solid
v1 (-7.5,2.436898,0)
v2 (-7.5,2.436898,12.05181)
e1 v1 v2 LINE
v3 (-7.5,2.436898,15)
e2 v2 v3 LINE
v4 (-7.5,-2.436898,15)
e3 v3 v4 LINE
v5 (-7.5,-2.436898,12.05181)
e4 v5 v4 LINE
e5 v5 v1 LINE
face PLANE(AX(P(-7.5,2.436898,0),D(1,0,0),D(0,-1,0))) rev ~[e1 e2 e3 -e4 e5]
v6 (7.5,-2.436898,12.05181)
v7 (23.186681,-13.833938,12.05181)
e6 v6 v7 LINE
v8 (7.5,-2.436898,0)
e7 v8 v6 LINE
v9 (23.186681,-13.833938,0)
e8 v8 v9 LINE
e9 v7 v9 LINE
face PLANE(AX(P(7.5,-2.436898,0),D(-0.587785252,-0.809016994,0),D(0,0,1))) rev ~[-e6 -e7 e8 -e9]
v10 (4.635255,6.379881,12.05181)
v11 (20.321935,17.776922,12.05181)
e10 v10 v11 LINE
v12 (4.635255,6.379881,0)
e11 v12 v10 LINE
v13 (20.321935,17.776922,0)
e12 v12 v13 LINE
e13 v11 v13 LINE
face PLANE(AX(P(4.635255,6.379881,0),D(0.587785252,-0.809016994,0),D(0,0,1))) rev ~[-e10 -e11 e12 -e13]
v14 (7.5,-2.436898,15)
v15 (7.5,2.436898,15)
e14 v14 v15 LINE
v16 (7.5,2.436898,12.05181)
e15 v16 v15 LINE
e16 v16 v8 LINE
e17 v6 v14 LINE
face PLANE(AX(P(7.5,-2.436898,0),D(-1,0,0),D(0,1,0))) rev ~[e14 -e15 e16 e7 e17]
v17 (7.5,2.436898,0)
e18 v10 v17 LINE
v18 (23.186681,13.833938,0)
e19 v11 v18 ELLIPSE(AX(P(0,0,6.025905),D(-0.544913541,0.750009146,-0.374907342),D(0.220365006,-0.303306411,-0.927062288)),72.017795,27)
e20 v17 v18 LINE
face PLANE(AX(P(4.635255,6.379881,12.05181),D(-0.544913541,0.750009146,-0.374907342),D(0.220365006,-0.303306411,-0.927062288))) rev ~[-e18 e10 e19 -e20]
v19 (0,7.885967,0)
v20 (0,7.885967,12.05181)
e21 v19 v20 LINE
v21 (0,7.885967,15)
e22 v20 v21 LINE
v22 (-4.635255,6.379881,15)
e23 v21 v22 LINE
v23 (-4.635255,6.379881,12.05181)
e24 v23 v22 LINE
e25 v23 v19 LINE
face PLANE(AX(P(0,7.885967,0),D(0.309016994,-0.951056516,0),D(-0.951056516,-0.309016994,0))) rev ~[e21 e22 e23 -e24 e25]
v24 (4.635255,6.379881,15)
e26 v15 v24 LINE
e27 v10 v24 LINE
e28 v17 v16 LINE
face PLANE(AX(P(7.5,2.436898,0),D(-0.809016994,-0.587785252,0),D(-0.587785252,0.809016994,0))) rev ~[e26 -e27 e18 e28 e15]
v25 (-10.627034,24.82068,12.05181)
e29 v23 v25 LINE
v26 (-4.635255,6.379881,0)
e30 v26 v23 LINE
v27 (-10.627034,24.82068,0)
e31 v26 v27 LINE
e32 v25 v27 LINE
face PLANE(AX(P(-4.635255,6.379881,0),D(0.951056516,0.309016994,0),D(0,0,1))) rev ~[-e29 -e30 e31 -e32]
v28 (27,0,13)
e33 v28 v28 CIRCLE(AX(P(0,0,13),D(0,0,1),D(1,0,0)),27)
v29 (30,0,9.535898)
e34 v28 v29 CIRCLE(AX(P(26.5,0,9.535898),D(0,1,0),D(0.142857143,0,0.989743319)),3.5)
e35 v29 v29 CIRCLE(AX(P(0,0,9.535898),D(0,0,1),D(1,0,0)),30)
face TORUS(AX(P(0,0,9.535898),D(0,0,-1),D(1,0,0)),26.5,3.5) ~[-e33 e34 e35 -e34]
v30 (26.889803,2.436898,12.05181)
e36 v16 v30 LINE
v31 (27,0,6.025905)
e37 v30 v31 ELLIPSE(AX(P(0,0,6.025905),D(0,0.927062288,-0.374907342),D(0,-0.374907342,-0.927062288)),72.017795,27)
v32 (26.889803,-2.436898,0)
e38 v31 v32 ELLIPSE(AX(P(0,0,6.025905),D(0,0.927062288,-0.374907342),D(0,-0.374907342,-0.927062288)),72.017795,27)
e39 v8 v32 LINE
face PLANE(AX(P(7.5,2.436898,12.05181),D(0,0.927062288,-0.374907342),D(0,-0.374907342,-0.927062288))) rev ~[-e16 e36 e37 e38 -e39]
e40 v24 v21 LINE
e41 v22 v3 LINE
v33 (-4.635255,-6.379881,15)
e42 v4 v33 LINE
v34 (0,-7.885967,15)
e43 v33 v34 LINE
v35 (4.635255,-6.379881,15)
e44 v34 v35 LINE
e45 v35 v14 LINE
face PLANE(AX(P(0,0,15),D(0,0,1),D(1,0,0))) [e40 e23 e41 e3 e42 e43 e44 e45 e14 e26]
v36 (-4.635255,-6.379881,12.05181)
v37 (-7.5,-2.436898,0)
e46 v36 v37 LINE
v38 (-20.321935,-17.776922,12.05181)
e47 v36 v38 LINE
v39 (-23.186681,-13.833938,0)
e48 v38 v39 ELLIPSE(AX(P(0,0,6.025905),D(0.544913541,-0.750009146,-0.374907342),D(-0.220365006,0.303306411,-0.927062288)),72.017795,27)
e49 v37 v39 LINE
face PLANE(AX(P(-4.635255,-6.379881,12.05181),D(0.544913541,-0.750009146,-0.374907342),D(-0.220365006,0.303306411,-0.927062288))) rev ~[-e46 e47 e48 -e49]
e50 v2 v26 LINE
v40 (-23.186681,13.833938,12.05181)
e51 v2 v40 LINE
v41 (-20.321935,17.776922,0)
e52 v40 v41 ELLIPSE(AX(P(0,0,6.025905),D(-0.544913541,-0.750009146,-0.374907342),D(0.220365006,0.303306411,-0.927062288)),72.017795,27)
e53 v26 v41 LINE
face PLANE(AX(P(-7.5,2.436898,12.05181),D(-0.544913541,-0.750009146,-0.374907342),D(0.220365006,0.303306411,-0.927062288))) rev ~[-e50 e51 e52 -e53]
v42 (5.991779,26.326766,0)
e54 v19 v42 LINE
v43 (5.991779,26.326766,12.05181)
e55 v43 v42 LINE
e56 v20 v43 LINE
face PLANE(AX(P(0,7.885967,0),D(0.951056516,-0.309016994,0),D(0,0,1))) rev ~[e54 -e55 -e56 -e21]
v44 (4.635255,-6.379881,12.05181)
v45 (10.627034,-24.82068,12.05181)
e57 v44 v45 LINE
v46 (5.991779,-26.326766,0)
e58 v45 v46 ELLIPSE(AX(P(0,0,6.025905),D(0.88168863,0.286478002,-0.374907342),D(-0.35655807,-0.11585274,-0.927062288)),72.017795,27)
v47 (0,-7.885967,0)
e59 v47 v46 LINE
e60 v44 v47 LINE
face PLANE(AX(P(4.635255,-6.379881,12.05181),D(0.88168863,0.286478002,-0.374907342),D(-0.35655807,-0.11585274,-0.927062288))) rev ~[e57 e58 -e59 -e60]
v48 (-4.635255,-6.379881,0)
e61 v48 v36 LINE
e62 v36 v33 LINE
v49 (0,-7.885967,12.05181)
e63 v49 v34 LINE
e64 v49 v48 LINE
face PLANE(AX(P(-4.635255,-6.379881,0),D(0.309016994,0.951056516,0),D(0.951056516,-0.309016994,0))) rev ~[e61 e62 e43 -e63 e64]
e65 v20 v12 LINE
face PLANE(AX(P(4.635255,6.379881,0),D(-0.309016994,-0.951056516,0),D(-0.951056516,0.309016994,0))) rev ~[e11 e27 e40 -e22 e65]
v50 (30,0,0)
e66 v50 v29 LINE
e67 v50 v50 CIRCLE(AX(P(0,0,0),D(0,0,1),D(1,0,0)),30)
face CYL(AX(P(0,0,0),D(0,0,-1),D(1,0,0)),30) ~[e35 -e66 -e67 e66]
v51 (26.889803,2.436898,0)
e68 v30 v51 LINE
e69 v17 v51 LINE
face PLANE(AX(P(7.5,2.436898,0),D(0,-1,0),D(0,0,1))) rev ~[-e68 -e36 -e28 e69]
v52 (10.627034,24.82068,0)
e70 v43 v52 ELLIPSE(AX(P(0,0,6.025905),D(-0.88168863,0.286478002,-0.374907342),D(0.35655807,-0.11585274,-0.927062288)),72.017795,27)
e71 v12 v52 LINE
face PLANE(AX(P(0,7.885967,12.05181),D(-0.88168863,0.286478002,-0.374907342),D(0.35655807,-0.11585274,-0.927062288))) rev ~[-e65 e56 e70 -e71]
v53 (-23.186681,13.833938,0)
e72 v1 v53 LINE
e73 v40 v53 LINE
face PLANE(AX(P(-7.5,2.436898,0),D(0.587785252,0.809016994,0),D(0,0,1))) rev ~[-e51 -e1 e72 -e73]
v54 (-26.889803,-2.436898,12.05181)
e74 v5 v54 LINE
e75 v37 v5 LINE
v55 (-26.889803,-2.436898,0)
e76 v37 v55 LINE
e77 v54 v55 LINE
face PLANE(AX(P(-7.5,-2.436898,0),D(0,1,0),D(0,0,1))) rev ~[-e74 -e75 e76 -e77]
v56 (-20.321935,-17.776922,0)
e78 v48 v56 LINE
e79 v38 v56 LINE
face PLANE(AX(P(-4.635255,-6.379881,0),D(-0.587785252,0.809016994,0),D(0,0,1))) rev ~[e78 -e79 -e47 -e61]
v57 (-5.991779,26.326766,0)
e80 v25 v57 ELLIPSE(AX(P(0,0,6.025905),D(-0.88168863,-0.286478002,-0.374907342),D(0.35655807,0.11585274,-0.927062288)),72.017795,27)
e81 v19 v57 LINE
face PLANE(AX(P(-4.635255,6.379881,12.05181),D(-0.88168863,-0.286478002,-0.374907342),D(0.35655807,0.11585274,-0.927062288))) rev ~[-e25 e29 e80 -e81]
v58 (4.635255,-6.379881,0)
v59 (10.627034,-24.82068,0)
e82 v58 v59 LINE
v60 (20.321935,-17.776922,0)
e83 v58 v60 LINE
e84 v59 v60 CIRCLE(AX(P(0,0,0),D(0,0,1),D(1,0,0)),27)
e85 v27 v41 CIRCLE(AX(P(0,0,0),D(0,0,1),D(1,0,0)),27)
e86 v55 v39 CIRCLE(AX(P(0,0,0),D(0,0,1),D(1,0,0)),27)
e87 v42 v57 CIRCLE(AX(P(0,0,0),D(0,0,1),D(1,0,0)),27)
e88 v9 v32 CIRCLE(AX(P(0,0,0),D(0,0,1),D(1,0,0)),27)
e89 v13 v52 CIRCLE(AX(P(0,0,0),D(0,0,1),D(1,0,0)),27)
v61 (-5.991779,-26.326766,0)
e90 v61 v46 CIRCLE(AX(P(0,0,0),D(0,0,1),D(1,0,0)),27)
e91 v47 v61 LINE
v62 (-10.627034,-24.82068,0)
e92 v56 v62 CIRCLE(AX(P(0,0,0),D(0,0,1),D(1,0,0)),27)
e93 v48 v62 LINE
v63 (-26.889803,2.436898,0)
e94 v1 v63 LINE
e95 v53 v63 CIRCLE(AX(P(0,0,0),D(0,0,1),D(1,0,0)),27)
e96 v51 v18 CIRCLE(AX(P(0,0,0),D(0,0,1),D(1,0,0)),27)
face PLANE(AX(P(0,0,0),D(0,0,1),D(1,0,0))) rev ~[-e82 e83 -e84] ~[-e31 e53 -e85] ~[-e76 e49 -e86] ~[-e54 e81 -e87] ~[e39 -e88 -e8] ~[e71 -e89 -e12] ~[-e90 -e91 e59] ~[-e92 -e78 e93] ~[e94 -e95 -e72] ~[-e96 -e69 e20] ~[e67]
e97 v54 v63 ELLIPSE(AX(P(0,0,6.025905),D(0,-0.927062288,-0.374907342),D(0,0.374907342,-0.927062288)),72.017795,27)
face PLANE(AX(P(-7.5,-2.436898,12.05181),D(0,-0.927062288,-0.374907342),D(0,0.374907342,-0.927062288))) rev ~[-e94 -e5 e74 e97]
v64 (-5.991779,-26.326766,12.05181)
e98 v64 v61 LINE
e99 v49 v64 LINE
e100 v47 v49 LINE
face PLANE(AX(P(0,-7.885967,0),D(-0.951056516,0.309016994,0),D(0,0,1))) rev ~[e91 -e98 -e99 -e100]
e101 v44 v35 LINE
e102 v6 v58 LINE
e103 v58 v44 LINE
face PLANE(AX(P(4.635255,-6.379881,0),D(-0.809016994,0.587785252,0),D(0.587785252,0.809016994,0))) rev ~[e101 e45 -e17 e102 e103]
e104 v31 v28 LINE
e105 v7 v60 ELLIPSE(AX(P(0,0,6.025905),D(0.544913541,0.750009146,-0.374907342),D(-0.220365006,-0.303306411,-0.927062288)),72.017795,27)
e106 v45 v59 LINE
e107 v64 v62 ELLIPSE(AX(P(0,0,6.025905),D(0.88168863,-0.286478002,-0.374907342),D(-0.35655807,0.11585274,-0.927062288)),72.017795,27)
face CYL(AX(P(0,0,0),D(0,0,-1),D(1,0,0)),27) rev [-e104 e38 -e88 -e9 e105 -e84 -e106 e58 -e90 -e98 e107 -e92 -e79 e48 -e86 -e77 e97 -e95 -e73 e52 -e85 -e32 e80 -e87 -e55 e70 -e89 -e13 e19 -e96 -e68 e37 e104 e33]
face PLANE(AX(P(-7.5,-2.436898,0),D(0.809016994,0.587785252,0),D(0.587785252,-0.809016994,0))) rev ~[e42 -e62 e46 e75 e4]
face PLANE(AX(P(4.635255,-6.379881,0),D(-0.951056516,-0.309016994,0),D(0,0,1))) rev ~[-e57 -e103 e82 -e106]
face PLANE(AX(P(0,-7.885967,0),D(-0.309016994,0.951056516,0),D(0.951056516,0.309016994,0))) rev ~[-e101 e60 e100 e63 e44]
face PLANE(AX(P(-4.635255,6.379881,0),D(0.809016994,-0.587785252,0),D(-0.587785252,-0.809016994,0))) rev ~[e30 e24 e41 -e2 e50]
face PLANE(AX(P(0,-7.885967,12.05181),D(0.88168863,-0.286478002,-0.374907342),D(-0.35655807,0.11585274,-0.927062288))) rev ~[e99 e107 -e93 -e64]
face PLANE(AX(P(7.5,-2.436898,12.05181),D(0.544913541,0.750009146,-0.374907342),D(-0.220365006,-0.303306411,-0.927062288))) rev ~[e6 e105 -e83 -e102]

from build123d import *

# Parameters (mm, degrees)
F1_DEPTH  = 15
F3_DEPTH  = 20
F5_DEPTH  = 20
F14_DEPTH = 20
F15_DEPTH = 20
F16_DEPTH = 20
F17_DEPTH = 20
F18_DEPTH = 20
F19_DEPTH = 20
F20_DEPTH = 20
F21_DEPTH = 20
F23_R     = 30
F23_R_2   = 27
F24_DEPTH = 13
F26_R     = 1
F27_DEPTH = 8


# Not quite as in the source:
# - a fillet or chamfer that OpenCascade refuses, or shapes differently, is made with other operations: its cross-section is extruded or revolved along the edge and cut away or added


with BuildPart() as f1:
    # F0 (on Top) → F1 (new body)
    with BuildSketch(Plane.XY):
        Polygon((7.5, -2.4368977217), (7.5, 2.4368977217), (4.6352549156, 6.3798810626), (0, 7.8859666818), (-4.6352549156, 6.3798810626), (-7.5, 2.4368977217), (-7.5, -2.4368977217), (-4.6352549156, -6.3798810626), (0, -7.8859666818), (4.6352549156, -6.3798810626), align=None)
    extrude(amount=F1_DEPTH)

    # F2 (on face) → F3 (join)
    with BuildSketch(Plane(origin=(-2.3176274578, -7.1329238722, 0), x_dir=(0.9510565163, -0.3090169944, 0), z_dir=(-0.3090169944, -0.9510565163, 0))):
        Polygon((2.4368977217, 12.0518097386), (-2.4368977217, 0), (2.4368977217, 0), align=None)
    extrude(amount=F3_DEPTH)

    # F4 (on face) → F5 (join)
    with BuildSketch(Plane(origin=(-6.0676274578, -4.4083893922, 0), x_dir=(0.5877852523, -0.8090169944, 0), z_dir=(-0.8090169944, -0.5877852523, 0))):
        Polygon((2.4368977217, 12.0518097386), (-2.4368977217, 0), (2.4368977217, 0), align=None)
    extrude(amount=F5_DEPTH)

    # F13 (on face) → F14 (join)
    with BuildSketch(Plane(origin=(2.3176274578, -7.1329238722, 0), x_dir=(0.9510565163, 0.3090169944, 0), z_dir=(0.3090169944, -0.9510565163, 0))):
        Polygon((2.4368977217, 12.0518097386), (-2.4368977217, 0), (2.4368977217, 0), align=None)
    extrude(amount=F14_DEPTH)

    # F12 (on face) → F15 (join)
    with BuildSketch(Plane(origin=(6.0676274578, -4.4083893922, 0), x_dir=(0.5877852523, 0.8090169944, 0), z_dir=(0.8090169944, -0.5877852523, 0))):
        Polygon((2.4368977217, 12.0518097386), (-2.4368977217, 0), (2.4368977217, 0), align=None)
    extrude(amount=F15_DEPTH)

    # F11 (on face) → F16 (join)
    with BuildSketch(Plane.YZ.offset(7.5)):
        Polygon((2.4368977217, 12.0518097386), (-2.4368977217, 0), (2.4368977217, 0), align=None)
    extrude(amount=F16_DEPTH)

    # F10 (on face) → F17 (join)
    with BuildSketch(Plane(origin=(6.0676274578, 4.4083893922, 0), x_dir=(-0.5877852523, 0.8090169944, 0), z_dir=(0.8090169944, 0.5877852523, 0))):
        Polygon((2.4368977217, 12.0518097386), (-2.4368977217, 0), (2.4368977217, 0), align=None)
    extrude(amount=F17_DEPTH)

    # F9 (on face) → F18 (join)
    with BuildSketch(Plane(origin=(2.3176274578, 7.1329238722, 0), x_dir=(-0.9510565163, 0.3090169944, 0), z_dir=(0.3090169944, 0.9510565163, 0))):
        Polygon((2.4368977217, 12.0518097386), (-2.4368977217, 0), (2.4368977217, 0), align=None)
    extrude(amount=F18_DEPTH)

    # F8 (on face) → F19 (join)
    with BuildSketch(Plane(origin=(-2.3176274578, 7.1329238722, 0), x_dir=(-0.9510565163, -0.3090169944, 0), z_dir=(-0.3090169944, 0.9510565163, 0))):
        Polygon((2.4368977217, 12.0518097386), (-2.4368977217, 0), (2.4368977217, 0), align=None)
    extrude(amount=F19_DEPTH)

    # F7 (on face) → F20 (join)
    with BuildSketch(Plane(origin=(-6.0676274578, 4.4083893922, 0), x_dir=(-0.5877852523, -0.8090169944, 0), z_dir=(-0.8090169944, 0.5877852523, 0))):
        Polygon((2.4368977217, 12.0518097386), (-2.4368977217, 0), (2.4368977217, 0), align=None)
    extrude(amount=F20_DEPTH)

    # F6 (on face) → F21 (join)
    with BuildSketch(Plane(origin=(-7.5, 0, 0), x_dir=(0, -1, 0), z_dir=(-1, 0, 0))):
        Polygon((2.4368977217, 12.0518097386), (-2.4368977217, 0), (2.4368977217, 0), align=None)
    extrude(amount=F21_DEPTH)

    # F23 (on face) → F24 (join)
    with BuildSketch(Plane.XY):
        Circle(F23_R)
        Circle(F23_R_2, mode=Mode.SUBTRACT)
    extrude(amount=F24_DEPTH)

    # F25: fillet of radius 3.5 on 1 edges, made by hand

    # F25_s1 → F25_t2 (revolve, cut)
    with BuildSketch(Plane.XZ):
        with BuildLine():
            ThreePointArc((27, 13), (29.1457513111, 11.8271862323), (30, 9.5358983849))
            Line((30, 9.5358983849), (30, 13))
            Line((30, 13), (27, 13))
        make_face()
    revolve(axis=Axis((0, 0, 13), (0, 0, 1)), mode=Mode.SUBTRACT)

    # F26 (on face) → F27 (join)
    with BuildSketch(Plane.XY):
        Circle(F26_R)
    extrude(amount=F27_DEPTH)


solid = f1.part
